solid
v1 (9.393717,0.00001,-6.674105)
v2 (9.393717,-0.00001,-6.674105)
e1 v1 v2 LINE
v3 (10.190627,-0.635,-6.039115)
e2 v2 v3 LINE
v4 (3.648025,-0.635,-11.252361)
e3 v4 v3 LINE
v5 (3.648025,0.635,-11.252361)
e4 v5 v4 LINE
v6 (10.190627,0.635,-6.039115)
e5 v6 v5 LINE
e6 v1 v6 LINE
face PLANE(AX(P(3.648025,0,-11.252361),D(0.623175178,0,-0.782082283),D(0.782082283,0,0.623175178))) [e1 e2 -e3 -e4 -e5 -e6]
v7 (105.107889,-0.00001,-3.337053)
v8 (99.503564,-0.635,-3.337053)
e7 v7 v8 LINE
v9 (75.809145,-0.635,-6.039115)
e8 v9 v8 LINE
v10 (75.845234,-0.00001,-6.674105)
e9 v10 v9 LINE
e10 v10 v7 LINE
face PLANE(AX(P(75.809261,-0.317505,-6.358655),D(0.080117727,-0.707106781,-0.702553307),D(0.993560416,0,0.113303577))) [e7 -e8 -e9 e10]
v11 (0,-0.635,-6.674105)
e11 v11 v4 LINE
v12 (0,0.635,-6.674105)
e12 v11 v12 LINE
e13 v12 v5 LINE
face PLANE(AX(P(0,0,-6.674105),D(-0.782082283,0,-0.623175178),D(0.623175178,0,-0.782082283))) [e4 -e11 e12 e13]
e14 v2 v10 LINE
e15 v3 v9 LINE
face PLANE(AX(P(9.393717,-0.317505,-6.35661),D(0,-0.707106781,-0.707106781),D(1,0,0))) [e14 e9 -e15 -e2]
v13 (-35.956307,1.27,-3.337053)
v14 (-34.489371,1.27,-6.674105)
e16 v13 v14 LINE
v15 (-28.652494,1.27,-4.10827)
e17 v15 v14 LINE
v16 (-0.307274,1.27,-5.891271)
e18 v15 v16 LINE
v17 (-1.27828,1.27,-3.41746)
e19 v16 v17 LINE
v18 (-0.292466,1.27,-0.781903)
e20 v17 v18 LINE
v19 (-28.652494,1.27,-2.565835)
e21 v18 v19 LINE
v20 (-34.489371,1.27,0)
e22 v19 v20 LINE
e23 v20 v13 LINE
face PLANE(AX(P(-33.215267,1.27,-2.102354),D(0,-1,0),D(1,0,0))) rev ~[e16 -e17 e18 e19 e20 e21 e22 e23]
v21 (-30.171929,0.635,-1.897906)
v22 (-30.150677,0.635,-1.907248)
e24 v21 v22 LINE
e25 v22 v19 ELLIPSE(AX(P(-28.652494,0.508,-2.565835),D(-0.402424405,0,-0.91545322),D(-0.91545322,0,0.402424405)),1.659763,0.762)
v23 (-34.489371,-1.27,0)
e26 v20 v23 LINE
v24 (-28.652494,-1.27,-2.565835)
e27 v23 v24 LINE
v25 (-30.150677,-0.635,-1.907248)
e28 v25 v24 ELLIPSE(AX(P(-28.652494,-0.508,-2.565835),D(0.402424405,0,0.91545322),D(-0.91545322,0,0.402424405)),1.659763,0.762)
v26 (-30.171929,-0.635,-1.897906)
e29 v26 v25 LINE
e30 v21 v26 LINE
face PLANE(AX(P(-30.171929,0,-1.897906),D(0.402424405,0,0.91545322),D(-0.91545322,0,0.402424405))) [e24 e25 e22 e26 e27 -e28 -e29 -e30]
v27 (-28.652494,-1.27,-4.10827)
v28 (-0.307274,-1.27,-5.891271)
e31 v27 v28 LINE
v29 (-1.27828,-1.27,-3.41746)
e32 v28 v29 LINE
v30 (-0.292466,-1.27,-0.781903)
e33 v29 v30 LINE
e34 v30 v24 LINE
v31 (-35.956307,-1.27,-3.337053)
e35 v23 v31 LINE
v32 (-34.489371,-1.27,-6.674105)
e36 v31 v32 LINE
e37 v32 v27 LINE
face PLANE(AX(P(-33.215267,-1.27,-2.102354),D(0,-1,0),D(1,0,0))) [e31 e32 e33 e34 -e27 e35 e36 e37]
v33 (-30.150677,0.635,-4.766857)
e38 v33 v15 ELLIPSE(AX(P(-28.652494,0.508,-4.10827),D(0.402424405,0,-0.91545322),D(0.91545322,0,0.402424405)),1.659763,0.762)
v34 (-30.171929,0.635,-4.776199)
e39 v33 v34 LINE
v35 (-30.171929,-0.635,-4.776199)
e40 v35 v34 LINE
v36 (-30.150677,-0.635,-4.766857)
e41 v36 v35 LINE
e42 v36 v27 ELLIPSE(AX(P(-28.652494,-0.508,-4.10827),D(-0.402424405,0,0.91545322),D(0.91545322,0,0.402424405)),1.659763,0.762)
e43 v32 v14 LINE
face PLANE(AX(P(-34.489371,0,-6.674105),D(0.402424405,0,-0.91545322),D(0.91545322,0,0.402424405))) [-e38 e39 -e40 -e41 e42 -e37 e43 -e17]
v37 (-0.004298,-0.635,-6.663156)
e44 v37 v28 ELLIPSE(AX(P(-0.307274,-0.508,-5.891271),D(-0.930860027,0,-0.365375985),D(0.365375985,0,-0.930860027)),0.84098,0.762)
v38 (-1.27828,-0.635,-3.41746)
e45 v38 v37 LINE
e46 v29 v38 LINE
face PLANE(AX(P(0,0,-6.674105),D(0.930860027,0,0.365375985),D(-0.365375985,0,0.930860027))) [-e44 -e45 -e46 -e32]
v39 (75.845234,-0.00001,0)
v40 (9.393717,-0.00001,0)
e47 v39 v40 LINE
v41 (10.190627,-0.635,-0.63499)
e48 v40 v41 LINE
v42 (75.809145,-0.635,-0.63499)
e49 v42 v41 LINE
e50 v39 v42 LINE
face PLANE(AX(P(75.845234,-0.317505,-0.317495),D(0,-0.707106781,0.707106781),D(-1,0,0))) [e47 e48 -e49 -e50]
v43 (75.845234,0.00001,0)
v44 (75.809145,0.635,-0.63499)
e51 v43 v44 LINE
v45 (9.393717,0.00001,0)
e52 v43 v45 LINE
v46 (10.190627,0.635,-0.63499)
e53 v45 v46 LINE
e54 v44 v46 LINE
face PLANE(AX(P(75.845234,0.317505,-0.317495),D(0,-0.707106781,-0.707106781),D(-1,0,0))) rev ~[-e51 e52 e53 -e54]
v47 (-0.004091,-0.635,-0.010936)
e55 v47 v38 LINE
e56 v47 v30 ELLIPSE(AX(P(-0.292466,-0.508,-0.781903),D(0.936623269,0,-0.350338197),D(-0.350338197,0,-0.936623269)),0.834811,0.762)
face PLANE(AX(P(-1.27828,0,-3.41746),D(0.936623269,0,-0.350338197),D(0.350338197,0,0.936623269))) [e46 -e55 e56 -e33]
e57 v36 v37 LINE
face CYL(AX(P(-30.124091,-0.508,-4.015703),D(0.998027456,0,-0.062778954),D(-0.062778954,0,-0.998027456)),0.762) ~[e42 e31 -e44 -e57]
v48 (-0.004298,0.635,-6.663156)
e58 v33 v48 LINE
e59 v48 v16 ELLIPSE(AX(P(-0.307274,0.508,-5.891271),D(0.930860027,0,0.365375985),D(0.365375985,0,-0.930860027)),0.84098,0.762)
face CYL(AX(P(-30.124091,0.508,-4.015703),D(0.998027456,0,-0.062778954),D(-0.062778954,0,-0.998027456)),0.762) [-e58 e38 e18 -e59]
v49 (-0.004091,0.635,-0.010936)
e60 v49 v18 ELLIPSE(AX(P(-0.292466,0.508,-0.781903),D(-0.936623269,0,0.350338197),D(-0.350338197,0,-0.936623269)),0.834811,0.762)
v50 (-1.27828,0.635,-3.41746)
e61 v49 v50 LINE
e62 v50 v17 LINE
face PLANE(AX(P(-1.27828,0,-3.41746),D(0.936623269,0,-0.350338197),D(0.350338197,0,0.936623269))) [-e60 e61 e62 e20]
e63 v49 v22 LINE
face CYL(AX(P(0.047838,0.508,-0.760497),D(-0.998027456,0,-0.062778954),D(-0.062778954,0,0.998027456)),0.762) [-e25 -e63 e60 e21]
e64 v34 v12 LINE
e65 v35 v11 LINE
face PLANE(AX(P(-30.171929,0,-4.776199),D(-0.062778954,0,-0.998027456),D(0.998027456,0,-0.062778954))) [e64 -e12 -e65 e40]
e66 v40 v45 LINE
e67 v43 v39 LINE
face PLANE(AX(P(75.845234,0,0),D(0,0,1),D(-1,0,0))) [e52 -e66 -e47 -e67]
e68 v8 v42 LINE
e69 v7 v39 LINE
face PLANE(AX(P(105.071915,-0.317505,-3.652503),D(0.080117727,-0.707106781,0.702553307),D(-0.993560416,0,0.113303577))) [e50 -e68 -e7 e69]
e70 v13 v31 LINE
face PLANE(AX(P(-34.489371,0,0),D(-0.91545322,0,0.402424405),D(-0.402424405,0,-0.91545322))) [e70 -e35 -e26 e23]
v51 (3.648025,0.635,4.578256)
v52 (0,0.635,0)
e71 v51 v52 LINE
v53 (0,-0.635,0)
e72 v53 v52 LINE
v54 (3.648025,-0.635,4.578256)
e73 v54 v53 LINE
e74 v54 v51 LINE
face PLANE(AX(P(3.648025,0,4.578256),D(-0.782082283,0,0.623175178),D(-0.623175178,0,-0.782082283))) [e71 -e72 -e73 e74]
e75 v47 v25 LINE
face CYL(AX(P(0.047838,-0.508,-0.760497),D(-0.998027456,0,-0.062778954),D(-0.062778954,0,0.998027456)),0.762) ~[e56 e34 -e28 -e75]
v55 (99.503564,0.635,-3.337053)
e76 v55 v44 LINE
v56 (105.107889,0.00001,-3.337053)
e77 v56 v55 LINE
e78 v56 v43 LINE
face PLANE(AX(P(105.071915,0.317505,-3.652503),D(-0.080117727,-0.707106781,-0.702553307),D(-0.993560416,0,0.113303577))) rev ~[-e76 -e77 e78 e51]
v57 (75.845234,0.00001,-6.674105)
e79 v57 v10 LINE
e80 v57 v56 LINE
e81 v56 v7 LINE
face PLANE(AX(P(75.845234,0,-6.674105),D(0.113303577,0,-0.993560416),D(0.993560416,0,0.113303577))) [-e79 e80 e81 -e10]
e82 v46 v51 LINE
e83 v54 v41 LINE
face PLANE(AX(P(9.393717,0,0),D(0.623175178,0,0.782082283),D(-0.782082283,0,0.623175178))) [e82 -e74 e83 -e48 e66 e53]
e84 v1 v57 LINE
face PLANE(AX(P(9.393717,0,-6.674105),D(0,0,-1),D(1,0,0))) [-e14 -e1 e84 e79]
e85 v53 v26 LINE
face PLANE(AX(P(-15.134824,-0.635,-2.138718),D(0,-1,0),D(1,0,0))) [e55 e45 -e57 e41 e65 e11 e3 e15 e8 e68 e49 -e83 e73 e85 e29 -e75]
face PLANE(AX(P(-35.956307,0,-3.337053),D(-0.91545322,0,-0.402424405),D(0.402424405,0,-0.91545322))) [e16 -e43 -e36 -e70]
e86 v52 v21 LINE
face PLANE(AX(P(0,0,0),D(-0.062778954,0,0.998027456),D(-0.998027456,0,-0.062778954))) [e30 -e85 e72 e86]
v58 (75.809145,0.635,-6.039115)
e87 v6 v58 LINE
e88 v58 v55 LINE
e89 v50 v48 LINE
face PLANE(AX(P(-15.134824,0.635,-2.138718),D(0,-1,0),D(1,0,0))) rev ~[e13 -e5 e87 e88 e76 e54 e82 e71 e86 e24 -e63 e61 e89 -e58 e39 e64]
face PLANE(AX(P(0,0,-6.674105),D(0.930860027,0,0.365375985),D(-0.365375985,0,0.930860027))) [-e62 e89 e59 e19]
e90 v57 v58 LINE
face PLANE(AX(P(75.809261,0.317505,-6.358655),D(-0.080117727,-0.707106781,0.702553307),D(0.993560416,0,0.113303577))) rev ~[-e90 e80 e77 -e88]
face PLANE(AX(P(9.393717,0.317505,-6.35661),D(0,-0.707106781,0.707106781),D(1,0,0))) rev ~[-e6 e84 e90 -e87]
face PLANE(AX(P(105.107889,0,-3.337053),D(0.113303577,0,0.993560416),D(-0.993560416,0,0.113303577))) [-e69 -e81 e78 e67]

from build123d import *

# Parameters (mm, degrees)
F1_DEPTH = 1.27
F2_R     = 0.762
F3_DEPTH = 0.635
F4_SIZE  = 0.63499


# Not quite as in the source:
# - a fillet or chamfer is up to 0.001 mm smaller than in the source, because OpenCascade refuses the exact size


with BuildPart() as f1:
    # F0 (on Front) → F1 (new body, symmetric)
    with BuildSketch(Plane.XZ):
        Polygon((-30.9530049562, -3.3370526507), (-30.1719289273, -1.8979058368), (-34.4893708825, 0), (-35.9563070381, -3.3370526507), align=None)
        Polygon((-30.1719289273, -4.7761994647), (-30.9530049562, -3.3370526507), (-35.9563070381, -3.3370526507), (-34.4893708825, -6.6741053015), align=None)
        Polygon((-1.278280112, -3.4174603466), (0, 0), (-30.1719289273, -1.8979058368), (-30.9530049562, -3.3370526507), align=None)
        Polygon((0, -6.6741053015), (-1.278280112, -3.4174603466), (-30.9530049562, -3.3370526507), (-30.1719289273, -4.7761994647), align=None)
    extrude(amount=F1_DEPTH, both=True)

    # F2
    f2_edges = [f1.edges().sort_by_distance(p)[0] for p in [
        (-15.085964, -1.27, -0.948953),
        (-15.085964, 1.27, -0.948953),
        (-15.085964, 1.27, -5.725152),
        (-15.085964, -1.27, -5.725152),
    ]]
    fillet(f2_edges, radius=F2_R)

    # F0 (on Front) → F3 (join, symmetric)
    with BuildSketch(Plane.XZ):
        Polygon((-1.278280112, -3.4174603466), (0, 0), (-30.1719289273, -1.8979058368), (-30.9530049562, -3.3370526507), align=None)
        Polygon((3.6480247509, 4.5782560483), (0, 0), (-1.278280112, -3.4174603466), (105.1078885794, -3.3370526507), (75.8452340961, 0), (9.3937172488, 0), align=None)
        Polygon((-30.9530049562, -3.3370526507), (-30.1719289273, -1.8979058368), (-34.4893708825, 0), (-35.9563070381, -3.3370526507), align=None)
        Polygon((105.1078885794, -3.3370526507), (-1.278280112, -3.4174603466), (0, -6.6741053015), (3.6480247509, -11.2523613498), (9.3937172488, -6.6741053015), (75.8452340961, -6.6741053015), align=None)
        Polygon((0, -6.6741053015), (-1.278280112, -3.4174603466), (-30.9530049562, -3.3370526507), (-30.1719289273, -4.7761994647), align=None)
        Polygon((-30.1719289273, -4.7761994647), (-30.9530049562, -3.3370526507), (-35.9563070381, -3.3370526507), (-34.4893708825, -6.6741053015), align=None)
    extrude(amount=F3_DEPTH, both=True)

    # F4 (size 0.635 in the source; OpenCascade refuses exactly that, so slightly less here)
    f4_edges = [f1.edges().sort_by_distance(p)[0] for p in [
        (42.619476, -0.635, -6.674105),
        (42.619476, 0.635, -6.674105),
        (42.619476, -0.635, 0),
        (42.619476, 0.635, 0),
        (90.476561, -0.635, -1.668526),
        (90.476561, 0.635, -1.668526),
        (90.476561, -0.635, -5.005579),
        (90.476561, 0.635, -5.005579),
    ]]
    chamfer(f4_edges, length=F4_SIZE)


solid = f1.part
